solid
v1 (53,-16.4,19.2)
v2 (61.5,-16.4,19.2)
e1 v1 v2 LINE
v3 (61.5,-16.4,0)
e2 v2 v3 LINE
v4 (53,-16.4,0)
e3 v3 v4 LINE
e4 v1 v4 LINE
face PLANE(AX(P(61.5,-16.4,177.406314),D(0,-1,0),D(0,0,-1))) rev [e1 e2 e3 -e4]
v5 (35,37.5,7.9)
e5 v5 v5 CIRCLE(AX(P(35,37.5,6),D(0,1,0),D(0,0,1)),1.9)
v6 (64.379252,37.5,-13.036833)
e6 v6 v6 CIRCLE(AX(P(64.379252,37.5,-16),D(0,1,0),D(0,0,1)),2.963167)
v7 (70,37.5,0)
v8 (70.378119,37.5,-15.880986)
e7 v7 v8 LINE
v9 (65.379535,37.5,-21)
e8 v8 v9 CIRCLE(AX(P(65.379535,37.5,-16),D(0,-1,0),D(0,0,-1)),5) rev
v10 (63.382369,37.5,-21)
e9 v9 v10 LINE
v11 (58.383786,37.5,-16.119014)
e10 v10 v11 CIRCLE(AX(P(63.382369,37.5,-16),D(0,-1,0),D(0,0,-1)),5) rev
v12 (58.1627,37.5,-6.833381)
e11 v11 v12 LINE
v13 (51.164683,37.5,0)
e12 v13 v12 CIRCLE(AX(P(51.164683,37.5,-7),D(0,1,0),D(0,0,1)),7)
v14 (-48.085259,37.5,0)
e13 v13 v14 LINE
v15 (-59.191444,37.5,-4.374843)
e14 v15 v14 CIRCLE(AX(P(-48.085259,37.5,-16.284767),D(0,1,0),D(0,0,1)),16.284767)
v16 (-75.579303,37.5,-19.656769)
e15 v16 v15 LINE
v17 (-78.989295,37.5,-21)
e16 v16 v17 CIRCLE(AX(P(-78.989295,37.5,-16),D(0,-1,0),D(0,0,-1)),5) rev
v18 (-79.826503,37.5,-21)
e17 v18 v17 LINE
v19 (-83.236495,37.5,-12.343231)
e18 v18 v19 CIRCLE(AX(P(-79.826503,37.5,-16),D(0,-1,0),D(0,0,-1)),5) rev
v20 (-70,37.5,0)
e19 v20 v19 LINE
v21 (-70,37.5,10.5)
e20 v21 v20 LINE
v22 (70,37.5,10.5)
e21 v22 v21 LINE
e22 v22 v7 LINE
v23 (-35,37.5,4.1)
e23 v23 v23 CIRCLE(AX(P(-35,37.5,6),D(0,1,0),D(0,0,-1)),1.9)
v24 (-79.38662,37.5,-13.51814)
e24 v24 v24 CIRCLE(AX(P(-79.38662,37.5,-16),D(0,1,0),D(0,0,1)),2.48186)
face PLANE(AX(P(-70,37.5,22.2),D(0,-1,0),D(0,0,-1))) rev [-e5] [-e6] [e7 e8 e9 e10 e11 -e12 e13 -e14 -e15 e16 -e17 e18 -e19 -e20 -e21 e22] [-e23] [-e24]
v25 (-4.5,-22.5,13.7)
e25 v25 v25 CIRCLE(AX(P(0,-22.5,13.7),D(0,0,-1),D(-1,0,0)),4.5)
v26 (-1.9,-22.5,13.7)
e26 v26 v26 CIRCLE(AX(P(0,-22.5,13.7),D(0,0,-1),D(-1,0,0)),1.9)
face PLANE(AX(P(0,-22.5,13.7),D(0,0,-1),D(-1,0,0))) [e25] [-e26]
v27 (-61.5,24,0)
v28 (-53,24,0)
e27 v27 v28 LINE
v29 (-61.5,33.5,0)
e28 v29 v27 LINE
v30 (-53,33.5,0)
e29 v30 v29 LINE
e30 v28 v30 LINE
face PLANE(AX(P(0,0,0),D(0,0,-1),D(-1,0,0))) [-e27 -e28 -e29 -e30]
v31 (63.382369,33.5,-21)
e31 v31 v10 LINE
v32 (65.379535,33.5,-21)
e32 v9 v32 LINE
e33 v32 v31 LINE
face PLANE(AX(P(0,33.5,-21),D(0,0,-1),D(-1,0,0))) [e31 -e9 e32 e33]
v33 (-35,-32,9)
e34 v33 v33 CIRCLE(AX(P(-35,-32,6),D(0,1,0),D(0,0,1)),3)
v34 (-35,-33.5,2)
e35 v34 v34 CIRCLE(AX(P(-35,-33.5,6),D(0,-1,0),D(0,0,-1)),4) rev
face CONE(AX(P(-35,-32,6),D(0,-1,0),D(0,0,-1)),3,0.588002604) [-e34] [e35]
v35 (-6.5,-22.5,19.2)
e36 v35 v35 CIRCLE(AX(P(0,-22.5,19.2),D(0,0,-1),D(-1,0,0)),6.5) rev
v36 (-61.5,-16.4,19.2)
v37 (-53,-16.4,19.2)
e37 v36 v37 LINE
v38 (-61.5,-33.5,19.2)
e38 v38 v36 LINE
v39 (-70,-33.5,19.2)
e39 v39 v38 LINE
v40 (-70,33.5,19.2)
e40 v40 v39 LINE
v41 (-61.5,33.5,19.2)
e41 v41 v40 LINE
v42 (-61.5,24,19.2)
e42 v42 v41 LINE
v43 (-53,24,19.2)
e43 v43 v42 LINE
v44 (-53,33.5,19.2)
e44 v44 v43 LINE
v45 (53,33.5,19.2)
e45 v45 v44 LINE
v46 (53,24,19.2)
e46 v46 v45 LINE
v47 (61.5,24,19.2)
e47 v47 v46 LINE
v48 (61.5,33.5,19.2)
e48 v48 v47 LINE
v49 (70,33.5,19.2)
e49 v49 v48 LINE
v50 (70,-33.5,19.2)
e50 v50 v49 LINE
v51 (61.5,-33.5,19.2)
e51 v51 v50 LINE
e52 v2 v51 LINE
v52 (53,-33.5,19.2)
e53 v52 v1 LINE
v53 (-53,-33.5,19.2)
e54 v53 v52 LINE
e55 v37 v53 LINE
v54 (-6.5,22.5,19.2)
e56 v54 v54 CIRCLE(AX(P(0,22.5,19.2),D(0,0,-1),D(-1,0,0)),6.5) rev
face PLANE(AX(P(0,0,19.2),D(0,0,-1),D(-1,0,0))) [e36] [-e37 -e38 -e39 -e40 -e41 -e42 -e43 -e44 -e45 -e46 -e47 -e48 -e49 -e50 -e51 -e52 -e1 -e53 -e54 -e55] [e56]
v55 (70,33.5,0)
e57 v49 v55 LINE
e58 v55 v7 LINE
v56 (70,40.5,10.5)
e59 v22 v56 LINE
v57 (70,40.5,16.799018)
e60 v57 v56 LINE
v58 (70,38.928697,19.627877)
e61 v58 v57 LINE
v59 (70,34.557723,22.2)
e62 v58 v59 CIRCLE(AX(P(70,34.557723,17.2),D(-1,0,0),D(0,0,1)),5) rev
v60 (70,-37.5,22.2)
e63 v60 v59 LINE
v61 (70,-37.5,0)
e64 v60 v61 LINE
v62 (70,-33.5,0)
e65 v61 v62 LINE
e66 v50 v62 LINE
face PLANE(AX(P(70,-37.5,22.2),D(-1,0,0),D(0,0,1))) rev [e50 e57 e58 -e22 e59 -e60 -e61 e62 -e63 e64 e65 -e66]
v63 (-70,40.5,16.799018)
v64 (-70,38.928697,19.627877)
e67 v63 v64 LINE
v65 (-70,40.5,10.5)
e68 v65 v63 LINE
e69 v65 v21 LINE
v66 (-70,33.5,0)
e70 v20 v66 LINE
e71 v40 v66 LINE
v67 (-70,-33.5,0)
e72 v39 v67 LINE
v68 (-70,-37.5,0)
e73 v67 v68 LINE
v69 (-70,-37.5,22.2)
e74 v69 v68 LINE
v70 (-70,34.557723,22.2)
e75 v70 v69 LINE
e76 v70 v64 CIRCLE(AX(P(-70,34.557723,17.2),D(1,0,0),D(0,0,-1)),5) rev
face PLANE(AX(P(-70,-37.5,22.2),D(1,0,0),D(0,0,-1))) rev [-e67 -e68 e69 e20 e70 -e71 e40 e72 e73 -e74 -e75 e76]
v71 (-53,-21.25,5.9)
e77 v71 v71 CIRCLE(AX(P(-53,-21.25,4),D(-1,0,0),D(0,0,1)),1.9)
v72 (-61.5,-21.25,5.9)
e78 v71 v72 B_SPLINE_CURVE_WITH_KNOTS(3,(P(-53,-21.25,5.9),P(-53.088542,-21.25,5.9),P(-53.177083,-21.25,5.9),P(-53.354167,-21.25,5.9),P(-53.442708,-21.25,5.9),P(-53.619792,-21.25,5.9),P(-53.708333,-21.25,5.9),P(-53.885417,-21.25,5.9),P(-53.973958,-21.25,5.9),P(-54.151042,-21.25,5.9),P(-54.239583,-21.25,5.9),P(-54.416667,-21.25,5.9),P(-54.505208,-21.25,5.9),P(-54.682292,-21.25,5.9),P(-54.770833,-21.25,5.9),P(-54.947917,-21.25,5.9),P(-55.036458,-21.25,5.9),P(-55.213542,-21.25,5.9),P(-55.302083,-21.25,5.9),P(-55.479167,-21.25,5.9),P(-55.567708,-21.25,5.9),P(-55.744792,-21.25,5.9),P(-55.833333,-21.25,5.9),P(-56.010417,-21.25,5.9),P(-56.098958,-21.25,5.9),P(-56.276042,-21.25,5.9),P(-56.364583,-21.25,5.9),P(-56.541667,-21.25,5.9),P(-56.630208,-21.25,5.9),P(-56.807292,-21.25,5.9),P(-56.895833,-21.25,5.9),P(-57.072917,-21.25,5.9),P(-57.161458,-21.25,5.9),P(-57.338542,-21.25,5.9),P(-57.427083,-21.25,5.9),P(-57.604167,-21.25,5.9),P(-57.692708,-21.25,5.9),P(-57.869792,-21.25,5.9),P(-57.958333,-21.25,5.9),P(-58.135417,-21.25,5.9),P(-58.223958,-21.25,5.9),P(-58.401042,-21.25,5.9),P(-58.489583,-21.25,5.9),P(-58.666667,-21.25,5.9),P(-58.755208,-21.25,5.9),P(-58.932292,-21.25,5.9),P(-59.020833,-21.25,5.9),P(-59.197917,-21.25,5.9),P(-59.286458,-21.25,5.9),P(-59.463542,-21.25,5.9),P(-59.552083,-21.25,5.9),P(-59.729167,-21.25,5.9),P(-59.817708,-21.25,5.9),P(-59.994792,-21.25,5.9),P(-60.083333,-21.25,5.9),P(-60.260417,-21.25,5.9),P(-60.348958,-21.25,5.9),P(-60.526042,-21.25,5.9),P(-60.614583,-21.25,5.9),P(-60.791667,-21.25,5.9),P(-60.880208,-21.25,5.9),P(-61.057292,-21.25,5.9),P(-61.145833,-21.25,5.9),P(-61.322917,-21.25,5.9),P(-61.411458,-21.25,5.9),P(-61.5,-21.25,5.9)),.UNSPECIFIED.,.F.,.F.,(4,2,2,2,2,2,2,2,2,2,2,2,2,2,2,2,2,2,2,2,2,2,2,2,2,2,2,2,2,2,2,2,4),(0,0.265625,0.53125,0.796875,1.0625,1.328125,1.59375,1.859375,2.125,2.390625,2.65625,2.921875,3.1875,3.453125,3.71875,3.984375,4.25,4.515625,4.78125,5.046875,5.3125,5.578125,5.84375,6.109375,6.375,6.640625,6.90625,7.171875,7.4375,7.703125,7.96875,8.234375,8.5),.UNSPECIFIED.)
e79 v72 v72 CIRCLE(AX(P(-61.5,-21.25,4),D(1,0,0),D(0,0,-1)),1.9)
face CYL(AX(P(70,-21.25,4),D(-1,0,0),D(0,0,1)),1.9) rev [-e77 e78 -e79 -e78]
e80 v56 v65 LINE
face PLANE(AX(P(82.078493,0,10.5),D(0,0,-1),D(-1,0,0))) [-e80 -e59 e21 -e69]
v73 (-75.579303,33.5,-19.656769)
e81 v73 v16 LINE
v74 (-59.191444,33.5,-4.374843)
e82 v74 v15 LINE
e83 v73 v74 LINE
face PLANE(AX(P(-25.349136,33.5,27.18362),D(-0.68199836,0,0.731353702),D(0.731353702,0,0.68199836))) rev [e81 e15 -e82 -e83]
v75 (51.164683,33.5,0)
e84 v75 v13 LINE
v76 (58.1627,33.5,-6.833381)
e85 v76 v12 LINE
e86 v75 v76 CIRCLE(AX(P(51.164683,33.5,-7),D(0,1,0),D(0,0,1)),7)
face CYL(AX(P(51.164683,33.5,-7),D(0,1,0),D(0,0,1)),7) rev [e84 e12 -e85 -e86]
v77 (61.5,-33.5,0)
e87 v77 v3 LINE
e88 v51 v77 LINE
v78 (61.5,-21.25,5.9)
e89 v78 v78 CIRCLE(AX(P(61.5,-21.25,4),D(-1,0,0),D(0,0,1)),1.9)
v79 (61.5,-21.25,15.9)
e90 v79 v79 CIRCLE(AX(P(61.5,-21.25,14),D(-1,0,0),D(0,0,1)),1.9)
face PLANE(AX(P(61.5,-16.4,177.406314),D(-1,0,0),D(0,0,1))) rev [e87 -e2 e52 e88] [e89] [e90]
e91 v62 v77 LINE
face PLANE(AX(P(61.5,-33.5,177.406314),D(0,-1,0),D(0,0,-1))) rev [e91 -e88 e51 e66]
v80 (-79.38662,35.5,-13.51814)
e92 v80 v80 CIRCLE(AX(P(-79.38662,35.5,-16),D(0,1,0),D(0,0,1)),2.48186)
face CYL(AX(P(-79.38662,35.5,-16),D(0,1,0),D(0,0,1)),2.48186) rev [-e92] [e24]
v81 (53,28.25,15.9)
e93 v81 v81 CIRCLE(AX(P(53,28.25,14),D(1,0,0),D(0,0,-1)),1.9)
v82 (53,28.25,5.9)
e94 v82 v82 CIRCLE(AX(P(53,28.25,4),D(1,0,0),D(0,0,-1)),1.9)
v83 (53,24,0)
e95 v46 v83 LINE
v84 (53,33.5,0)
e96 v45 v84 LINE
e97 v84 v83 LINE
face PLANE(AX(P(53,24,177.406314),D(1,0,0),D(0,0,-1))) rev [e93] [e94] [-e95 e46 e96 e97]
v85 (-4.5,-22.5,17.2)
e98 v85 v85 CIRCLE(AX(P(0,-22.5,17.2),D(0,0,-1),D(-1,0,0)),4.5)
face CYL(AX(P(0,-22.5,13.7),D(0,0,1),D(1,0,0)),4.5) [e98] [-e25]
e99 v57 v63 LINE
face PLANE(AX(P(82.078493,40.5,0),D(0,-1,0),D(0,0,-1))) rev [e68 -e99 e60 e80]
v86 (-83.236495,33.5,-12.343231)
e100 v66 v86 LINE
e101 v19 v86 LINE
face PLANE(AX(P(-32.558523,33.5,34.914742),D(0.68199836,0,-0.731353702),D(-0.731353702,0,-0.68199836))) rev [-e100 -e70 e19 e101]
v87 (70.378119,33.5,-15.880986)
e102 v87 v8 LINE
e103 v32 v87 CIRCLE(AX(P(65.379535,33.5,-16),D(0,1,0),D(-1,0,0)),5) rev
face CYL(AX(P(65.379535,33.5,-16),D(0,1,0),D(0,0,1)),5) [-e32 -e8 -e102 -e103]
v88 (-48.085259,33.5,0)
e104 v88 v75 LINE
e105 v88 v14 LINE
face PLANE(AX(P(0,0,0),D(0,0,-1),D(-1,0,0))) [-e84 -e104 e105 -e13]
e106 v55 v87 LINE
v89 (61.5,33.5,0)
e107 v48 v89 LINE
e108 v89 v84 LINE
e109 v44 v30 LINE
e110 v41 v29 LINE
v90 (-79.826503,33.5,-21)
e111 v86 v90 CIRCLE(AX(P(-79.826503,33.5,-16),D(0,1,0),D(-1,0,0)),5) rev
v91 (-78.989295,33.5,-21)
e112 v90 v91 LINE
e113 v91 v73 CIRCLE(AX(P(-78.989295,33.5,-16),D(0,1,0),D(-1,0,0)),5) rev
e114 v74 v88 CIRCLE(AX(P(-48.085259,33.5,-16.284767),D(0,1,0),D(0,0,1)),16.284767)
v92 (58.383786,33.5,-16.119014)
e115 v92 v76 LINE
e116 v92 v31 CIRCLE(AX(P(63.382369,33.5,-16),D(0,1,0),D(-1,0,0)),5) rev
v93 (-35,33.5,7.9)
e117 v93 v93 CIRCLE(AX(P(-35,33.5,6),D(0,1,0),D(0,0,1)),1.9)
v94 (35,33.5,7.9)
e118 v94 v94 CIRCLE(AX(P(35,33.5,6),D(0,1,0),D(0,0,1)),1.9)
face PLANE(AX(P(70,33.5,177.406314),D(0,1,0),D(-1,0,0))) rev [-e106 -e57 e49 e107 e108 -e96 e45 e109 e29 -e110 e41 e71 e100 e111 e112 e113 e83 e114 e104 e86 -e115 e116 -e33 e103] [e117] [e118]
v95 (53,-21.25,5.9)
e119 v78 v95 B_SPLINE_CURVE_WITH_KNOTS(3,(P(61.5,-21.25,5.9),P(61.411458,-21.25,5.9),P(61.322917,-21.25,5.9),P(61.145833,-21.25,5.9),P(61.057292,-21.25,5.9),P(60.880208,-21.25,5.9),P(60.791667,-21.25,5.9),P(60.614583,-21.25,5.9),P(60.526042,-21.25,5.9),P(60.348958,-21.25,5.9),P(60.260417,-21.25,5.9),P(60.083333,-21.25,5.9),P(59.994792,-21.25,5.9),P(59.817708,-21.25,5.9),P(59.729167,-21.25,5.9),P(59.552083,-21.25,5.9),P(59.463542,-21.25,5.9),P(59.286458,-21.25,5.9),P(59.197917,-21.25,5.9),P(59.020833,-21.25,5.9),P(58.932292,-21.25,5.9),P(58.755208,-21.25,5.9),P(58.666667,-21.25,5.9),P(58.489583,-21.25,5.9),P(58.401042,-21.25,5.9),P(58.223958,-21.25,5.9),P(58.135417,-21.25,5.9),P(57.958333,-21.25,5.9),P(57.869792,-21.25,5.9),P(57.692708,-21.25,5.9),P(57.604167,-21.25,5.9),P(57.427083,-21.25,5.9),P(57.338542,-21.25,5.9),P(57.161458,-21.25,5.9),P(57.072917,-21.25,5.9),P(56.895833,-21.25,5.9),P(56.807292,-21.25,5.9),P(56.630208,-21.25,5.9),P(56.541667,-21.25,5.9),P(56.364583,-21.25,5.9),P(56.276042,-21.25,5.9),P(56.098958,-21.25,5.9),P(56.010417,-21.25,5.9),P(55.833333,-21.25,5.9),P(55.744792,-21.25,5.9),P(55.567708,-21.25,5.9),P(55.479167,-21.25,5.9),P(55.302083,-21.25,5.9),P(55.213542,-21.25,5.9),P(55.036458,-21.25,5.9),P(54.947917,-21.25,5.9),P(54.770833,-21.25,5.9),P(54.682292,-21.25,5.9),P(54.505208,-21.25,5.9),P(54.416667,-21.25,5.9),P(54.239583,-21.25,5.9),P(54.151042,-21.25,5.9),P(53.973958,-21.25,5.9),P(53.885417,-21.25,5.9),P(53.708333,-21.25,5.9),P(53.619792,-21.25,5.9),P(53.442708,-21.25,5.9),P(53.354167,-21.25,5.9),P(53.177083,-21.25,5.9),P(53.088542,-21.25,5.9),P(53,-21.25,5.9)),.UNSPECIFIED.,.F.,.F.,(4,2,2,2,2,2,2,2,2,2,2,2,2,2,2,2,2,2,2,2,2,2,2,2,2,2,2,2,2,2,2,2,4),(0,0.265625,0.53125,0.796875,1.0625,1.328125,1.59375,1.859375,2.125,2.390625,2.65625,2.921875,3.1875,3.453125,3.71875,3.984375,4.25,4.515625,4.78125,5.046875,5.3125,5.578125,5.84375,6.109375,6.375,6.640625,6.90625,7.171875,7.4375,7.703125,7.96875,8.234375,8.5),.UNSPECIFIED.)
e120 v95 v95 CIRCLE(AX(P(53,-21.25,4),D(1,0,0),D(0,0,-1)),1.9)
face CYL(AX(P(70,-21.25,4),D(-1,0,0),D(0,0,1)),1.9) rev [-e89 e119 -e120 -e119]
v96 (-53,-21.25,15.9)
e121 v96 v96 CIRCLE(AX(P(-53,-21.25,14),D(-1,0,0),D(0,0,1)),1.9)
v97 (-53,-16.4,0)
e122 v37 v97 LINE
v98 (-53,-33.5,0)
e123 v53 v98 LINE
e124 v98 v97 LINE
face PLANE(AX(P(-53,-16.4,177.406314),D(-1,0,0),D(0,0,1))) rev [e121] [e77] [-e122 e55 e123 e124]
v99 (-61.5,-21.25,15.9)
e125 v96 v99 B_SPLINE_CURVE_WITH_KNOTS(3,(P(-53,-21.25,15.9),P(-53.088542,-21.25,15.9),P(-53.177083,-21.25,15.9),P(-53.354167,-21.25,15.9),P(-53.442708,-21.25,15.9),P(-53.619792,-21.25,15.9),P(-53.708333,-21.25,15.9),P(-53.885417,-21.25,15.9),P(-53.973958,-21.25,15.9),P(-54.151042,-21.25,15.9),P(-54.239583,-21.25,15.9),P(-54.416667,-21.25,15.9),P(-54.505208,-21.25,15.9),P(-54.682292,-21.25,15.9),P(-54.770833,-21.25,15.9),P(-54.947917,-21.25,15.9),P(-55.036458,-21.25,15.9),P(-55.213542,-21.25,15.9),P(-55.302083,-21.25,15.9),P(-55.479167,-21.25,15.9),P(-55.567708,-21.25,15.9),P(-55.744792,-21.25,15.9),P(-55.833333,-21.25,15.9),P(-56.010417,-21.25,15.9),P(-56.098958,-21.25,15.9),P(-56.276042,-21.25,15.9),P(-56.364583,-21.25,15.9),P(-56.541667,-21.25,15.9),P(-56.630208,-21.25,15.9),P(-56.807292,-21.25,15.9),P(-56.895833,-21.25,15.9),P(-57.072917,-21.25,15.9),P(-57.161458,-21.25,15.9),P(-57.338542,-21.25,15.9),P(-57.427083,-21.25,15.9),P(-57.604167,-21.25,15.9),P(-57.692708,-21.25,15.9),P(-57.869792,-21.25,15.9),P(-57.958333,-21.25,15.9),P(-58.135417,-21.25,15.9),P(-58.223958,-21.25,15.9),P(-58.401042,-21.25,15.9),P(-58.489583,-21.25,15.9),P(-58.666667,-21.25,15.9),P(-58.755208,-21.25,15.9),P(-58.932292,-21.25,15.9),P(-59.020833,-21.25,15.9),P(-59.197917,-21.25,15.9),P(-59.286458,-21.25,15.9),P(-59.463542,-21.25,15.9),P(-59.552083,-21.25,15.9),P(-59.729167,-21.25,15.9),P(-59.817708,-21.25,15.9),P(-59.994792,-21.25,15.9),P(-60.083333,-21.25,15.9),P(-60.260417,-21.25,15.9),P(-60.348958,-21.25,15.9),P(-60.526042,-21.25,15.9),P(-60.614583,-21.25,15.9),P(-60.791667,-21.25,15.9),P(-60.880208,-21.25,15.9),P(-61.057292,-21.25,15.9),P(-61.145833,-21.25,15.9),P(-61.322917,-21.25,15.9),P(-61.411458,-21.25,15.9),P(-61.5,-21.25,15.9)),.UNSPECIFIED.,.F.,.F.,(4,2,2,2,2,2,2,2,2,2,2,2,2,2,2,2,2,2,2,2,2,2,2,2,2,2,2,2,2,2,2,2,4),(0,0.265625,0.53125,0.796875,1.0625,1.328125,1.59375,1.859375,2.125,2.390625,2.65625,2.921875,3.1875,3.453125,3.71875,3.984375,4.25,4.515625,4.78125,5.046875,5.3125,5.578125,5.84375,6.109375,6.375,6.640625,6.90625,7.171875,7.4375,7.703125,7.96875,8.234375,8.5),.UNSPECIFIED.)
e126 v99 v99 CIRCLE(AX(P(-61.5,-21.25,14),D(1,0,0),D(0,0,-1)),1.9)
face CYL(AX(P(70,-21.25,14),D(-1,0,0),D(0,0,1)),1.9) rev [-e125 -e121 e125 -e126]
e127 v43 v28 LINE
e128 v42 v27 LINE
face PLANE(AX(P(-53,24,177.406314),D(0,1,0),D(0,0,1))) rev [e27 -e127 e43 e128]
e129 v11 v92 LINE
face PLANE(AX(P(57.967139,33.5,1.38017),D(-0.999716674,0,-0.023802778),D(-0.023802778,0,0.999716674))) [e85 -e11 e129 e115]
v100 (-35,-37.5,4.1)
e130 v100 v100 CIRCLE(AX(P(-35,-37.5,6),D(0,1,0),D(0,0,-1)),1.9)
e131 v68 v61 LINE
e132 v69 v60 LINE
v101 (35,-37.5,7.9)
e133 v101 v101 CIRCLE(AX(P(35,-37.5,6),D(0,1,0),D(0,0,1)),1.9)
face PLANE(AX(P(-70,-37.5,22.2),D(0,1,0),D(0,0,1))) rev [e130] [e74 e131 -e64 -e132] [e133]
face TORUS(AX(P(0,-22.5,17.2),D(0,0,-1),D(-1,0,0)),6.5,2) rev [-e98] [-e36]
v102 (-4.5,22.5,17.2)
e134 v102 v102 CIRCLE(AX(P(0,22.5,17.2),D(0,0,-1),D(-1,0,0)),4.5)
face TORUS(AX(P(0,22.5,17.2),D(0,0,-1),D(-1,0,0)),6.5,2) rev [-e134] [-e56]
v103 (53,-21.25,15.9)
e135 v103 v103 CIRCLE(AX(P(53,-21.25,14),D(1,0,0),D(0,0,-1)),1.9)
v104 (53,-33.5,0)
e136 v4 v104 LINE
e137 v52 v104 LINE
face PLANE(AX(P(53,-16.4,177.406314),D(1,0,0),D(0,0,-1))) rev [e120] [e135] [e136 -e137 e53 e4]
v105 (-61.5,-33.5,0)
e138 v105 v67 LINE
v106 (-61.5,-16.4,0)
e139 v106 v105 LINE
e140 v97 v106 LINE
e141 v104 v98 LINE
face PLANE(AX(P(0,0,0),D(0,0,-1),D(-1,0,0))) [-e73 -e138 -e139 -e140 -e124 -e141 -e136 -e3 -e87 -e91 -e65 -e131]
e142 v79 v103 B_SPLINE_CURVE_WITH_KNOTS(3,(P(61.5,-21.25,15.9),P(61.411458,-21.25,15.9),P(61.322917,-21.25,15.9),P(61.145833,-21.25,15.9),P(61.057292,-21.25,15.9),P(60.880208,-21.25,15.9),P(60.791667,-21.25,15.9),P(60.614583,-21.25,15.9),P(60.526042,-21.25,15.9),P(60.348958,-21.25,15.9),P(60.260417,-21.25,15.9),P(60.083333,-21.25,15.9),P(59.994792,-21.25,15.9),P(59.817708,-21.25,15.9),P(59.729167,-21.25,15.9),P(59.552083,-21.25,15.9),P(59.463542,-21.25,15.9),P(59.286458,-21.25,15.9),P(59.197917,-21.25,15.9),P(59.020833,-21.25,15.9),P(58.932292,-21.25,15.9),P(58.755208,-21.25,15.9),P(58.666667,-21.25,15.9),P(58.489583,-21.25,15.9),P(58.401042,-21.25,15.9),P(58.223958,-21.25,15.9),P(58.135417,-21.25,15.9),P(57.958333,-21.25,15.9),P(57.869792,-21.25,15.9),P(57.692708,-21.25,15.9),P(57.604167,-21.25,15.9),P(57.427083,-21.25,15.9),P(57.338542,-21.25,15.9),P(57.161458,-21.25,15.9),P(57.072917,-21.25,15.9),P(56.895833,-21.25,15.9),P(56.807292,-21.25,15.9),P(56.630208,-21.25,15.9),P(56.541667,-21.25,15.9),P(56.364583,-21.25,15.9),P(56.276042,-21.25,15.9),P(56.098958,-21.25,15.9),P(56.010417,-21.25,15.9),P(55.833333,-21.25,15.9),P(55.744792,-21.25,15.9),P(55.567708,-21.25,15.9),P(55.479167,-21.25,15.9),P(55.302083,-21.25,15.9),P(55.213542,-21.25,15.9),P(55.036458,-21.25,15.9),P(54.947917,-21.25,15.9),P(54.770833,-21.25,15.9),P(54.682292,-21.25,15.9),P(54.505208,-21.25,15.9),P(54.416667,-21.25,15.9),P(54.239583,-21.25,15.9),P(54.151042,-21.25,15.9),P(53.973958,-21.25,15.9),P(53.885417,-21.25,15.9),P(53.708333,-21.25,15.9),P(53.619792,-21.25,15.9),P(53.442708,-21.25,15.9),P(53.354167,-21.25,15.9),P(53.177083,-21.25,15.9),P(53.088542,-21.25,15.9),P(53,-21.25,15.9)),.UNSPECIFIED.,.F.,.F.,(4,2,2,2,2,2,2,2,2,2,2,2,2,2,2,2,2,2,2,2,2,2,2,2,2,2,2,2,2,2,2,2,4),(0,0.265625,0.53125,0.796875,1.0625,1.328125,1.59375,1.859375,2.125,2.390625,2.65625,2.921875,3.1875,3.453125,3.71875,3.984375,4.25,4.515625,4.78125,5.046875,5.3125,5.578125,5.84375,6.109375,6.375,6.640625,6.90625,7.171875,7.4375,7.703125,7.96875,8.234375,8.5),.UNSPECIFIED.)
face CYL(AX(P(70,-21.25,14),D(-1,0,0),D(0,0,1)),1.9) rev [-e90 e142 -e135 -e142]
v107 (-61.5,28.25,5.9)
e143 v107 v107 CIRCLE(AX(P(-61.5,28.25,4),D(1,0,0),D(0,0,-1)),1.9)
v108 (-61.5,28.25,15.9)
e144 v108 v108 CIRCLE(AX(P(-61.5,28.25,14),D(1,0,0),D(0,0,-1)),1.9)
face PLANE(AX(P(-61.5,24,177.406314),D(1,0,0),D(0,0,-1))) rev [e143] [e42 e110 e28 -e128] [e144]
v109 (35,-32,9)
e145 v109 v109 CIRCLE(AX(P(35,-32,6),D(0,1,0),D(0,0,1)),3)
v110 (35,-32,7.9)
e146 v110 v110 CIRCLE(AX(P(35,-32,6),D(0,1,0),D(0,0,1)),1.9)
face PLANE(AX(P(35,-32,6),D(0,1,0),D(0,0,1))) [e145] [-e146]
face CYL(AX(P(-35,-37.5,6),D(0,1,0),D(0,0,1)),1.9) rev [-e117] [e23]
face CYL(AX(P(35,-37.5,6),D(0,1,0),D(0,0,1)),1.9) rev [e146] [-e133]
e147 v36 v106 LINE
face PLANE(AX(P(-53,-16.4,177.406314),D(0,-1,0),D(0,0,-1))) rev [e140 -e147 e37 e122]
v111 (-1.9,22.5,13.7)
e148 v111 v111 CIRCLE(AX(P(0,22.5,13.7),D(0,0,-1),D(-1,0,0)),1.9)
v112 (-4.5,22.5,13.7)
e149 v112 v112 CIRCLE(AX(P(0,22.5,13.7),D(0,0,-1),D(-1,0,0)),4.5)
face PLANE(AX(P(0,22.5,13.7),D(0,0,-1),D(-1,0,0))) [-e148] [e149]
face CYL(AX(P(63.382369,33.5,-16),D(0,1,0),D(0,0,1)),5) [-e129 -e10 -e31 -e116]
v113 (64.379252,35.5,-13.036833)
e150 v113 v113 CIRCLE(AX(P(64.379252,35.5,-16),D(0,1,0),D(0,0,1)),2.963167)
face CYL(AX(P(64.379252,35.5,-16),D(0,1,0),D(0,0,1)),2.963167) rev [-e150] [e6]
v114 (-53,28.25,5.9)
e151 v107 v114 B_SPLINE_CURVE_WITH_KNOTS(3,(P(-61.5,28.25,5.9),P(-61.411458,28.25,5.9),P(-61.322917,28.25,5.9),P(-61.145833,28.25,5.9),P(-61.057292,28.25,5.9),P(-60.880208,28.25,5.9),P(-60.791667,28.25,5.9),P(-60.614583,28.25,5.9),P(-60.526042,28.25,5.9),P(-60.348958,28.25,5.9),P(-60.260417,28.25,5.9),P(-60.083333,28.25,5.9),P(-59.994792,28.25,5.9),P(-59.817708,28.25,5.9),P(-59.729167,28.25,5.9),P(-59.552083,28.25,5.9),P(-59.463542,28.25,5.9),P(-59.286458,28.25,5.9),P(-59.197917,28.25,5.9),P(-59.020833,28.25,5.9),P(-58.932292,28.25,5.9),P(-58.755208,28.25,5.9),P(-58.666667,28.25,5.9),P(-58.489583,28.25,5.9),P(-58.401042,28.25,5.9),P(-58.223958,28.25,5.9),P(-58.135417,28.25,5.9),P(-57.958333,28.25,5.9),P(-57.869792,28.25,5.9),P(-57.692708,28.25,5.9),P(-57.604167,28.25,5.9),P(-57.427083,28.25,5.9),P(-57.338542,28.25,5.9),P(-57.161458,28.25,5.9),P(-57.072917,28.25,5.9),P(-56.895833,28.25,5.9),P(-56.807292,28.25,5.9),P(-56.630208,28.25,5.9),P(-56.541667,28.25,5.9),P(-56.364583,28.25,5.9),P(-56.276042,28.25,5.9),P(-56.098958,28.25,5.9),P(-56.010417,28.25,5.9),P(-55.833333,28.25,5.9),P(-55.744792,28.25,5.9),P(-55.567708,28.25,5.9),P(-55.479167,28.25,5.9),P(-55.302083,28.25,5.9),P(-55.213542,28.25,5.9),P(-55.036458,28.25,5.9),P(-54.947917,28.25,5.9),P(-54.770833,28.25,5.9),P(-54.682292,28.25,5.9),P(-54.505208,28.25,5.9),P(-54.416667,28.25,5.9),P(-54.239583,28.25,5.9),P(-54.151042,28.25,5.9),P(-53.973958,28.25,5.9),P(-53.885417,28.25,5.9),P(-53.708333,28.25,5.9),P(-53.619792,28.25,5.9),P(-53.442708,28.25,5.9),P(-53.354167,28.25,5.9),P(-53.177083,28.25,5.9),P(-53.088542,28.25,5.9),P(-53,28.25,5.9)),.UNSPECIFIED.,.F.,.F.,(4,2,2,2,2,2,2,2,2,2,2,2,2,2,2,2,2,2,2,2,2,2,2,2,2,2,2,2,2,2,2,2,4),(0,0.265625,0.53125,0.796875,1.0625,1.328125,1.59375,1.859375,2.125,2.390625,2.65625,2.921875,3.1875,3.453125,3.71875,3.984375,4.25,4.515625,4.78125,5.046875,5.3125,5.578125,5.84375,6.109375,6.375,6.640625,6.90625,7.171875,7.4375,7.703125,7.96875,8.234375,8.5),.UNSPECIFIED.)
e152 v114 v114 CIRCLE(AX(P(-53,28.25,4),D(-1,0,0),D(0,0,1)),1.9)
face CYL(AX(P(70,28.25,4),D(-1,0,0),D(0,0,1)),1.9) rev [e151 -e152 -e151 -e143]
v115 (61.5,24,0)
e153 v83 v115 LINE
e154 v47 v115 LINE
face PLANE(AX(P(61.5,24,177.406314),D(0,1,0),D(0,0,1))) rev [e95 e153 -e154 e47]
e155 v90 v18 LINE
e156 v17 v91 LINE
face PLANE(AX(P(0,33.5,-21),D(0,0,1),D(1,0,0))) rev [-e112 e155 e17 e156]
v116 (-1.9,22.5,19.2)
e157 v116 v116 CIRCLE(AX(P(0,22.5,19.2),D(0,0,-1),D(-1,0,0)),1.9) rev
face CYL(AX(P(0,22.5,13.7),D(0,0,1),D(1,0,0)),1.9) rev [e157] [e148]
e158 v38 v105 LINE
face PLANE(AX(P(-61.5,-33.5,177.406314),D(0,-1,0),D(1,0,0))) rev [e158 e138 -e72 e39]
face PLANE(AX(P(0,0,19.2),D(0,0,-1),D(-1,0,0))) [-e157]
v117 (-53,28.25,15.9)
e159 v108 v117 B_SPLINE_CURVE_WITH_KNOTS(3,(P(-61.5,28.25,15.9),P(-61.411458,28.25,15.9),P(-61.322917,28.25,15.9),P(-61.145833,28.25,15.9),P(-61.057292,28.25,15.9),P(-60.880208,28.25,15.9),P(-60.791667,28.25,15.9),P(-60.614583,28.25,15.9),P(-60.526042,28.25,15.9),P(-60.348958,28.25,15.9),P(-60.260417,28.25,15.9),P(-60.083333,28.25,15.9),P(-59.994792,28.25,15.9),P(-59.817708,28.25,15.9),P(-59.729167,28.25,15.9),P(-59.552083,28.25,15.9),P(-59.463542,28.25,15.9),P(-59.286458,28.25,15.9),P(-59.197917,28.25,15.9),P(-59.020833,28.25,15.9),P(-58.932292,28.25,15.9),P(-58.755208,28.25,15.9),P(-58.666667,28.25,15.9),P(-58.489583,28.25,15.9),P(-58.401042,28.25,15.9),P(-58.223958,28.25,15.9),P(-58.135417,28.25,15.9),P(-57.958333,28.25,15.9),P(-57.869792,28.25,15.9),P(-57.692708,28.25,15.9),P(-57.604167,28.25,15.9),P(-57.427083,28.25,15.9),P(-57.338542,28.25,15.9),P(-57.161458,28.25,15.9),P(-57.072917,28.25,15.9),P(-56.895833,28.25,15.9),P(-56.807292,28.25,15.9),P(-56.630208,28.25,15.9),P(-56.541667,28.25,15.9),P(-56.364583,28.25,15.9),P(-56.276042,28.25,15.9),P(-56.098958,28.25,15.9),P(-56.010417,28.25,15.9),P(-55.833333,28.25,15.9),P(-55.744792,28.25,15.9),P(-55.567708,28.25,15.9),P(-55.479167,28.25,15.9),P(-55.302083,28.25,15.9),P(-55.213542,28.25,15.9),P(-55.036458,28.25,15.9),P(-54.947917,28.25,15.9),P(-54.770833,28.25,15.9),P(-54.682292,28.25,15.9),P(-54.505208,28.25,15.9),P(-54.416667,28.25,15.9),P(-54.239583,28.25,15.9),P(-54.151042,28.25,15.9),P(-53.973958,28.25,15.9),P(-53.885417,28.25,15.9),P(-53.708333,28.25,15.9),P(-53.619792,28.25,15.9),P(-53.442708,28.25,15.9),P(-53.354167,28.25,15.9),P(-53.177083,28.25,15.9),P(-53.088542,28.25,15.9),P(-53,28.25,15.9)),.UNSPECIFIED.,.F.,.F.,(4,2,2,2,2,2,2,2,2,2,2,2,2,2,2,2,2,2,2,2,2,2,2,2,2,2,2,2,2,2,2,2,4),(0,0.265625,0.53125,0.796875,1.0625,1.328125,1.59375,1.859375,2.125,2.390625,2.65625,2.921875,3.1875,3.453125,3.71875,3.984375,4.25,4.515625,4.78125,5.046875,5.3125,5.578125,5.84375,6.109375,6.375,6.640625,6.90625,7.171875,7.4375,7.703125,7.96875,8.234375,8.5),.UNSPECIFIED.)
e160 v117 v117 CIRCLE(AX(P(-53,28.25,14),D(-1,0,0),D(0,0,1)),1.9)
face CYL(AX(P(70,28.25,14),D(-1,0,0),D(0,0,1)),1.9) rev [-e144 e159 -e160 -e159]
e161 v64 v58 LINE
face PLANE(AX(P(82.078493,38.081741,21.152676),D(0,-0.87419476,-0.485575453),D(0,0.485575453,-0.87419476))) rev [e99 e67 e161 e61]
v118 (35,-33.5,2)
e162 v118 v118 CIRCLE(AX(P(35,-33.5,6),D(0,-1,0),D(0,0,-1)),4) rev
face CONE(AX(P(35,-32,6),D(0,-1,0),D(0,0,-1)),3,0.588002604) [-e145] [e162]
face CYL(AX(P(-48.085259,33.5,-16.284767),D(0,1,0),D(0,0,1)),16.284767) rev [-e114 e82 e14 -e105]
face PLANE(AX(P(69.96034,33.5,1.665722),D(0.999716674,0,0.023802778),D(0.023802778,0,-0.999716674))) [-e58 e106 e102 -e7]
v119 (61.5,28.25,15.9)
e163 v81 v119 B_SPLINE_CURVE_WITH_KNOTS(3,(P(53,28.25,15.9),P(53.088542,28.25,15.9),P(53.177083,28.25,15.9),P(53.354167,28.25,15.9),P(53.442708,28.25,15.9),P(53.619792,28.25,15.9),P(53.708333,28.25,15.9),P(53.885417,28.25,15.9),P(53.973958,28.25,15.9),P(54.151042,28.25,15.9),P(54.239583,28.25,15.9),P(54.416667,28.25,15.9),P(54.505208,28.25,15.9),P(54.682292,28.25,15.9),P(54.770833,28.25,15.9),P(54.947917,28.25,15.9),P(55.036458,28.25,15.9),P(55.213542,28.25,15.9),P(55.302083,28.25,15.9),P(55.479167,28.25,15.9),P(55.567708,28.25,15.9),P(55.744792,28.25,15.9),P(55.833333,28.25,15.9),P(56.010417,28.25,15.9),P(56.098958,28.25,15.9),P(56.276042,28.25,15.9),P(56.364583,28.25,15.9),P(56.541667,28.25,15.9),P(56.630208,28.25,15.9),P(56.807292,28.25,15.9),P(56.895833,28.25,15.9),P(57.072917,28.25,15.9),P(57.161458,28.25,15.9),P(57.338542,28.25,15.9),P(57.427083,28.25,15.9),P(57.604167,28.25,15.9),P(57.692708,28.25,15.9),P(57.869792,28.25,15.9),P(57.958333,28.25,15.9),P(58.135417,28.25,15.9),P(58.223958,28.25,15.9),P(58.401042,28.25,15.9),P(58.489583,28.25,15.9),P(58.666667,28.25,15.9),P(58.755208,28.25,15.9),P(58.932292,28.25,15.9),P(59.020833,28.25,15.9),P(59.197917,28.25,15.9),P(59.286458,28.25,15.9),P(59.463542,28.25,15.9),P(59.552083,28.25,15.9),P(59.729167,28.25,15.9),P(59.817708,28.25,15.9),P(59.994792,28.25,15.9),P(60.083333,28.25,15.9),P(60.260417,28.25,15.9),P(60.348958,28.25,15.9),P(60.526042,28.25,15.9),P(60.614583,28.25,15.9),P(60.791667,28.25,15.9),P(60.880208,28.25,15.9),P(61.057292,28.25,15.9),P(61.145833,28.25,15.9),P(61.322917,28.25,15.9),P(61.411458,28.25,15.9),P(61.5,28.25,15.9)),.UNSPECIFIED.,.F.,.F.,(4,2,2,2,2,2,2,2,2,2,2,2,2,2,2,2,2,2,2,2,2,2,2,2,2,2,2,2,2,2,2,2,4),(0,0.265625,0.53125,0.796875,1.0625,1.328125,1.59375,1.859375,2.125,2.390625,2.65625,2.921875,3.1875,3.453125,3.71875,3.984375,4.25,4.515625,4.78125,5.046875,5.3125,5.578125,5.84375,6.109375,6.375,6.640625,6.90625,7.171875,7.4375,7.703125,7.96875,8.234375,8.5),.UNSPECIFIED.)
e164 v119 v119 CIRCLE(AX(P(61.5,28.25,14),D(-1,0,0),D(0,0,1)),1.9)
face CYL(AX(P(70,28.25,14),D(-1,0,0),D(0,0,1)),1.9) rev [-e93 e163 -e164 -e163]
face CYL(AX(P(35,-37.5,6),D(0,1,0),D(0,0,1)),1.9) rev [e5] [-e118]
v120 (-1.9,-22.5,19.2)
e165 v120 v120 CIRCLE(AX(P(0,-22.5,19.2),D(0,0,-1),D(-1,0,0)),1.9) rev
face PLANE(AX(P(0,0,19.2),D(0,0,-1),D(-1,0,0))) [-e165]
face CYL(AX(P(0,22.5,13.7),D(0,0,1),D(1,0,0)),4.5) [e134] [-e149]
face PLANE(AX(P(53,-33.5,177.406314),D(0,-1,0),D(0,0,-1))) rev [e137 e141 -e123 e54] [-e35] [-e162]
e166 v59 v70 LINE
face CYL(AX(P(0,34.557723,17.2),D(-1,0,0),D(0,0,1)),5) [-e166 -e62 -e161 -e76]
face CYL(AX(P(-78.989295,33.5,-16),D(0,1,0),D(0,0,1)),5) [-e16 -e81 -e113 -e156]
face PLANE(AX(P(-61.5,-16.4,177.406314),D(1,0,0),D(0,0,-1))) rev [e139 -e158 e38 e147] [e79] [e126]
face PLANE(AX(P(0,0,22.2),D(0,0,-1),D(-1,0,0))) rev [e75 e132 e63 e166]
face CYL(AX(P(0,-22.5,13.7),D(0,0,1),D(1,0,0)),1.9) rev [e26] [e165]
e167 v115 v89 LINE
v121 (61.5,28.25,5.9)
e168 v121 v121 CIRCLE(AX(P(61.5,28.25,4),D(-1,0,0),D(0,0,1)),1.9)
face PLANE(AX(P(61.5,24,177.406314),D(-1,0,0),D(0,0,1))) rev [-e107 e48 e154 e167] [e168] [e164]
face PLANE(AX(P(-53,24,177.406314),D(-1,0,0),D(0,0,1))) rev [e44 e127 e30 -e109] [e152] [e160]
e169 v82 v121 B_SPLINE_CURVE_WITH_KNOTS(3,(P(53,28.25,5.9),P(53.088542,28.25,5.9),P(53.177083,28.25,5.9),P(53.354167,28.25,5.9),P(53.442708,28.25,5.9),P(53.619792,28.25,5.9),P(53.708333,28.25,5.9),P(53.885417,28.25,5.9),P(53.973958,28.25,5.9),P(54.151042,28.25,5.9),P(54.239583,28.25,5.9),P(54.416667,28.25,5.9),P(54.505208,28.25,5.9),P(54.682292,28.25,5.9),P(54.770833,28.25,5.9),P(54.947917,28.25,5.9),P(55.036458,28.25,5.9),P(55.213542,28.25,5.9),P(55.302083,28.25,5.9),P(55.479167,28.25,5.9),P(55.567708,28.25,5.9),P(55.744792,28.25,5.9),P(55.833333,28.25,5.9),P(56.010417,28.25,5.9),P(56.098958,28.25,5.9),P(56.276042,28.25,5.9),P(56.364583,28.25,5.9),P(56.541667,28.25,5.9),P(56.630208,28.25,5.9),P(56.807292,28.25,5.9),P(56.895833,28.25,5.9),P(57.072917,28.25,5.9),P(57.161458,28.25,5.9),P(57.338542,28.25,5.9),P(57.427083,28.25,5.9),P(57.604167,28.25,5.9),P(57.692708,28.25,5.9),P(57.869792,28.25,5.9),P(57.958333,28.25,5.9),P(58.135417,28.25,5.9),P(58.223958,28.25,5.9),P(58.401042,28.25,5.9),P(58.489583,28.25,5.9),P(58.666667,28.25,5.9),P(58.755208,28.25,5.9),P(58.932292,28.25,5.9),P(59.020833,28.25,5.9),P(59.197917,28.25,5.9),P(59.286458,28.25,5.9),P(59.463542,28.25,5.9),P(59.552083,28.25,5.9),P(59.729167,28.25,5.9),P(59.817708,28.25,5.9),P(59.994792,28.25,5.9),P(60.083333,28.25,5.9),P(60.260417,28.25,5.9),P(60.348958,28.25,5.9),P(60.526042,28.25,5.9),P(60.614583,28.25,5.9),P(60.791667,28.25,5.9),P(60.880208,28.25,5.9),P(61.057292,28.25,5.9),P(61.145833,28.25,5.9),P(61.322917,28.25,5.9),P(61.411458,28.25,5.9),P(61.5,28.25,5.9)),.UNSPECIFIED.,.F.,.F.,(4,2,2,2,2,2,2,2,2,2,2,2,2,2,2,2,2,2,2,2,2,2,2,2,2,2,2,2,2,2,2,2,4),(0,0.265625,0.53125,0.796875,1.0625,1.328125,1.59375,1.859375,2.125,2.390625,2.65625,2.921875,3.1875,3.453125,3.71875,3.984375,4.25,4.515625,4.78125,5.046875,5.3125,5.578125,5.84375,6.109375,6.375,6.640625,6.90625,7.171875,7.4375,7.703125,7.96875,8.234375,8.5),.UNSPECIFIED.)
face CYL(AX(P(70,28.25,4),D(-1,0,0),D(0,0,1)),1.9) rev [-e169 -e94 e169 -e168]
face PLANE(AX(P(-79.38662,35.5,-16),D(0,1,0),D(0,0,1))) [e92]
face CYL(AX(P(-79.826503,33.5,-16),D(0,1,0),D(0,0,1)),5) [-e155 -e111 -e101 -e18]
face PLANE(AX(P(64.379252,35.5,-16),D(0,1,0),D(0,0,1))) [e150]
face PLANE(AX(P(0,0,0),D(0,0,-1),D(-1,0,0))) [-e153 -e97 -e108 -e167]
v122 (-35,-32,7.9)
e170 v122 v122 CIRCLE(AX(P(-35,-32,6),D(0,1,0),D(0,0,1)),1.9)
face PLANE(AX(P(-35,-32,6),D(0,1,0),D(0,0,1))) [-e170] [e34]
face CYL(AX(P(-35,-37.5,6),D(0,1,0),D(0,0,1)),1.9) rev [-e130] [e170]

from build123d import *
from OCP.BRepFilletAPI import BRepFilletAPI_MakeChamfer

# Parameters (mm, degrees)
SKETCH1_W               = 140
SKETCH1_H               = 75
BOSS_EXTRUDE1_DEPTH     = 22.2
CUT_EXTRUDE1_DEPTH      = 19.2
CUT_EXTRUDE2_DEPTH      = 147.625679879
CUT_EXTRUDE2_DEPTH_BACK = 147.625679879
SKETCH3_R               = 1.9
CUT_EXTRUDE5_DEPTH      = 103.146169776
CUT_EXTRUDE5_DEPTH_BACK = 103.146169776
SKETCH9_R               = 1.9
BOSS_EXTRUDE6_DEPTH     = 4
FILLET2_R               = 5
BOSS_EXTRUDE10_DEPTH    = 140
FILLET5_R               = 5
SKETCH28_R              = 2.481859786
SKETCH28_R_2            = 2.963166916
CUT_EXTRUDE11_DEPTH     = 2
SKETCH27_R              = 4
SKETCH27_R_2            = 1.9
BOSS_EXTRUDE15_DEPTH    = 1.5
CHAMFER1_SIZE           = 1.5
CHAMFER1_SIZE_2         = 1
SKETCH29_R              = 4.5
SKETCH29_R_2            = 1.9
BOSS_EXTRUDE16_DEPTH    = 5.5
FILLET7_R               = 2


with BuildPart() as part:
    # Sketch1 → Boss-Extrude1 (new body)
    with BuildSketch(Plane.XY):
        Rectangle(SKETCH1_W, SKETCH1_H)
    extrude(amount=BOSS_EXTRUDE1_DEPTH)

    # Sketch2 → Cut-Extrude1 (cut)
    with BuildSketch(Plane(origin=(0, 0, 0), x_dir=(-1, 0, 0), z_dir=(0, 0, -1))):
        Polygon((-61.5, 24), (-53, 24), (-53, 33.5), (53, 33.5), (53, 24), (61.5, 24), (61.5, 33.5), (70, 33.5), (70, 20.2), (70, -20.2), (70, -33.5), (61.5, -33.5), (61.5, -16.4), (53, -16.4), (53, -33.5), (-53, -33.5), (-53, -16.4), (-61.5, -16.4), (-61.5, -33.5), (-70, -33.5), (-70, -20), (-70, 20), (-70, 33.5), (-61.5, 33.5), align=None)
    extrude(amount=-CUT_EXTRUDE1_DEPTH, mode=Mode.SUBTRACT)

    # Sketch3 → Cut-Extrude2 (cut, two sides: drawn at the far end of the back side and taken through both)
    with BuildSketch(Plane.ZY.offset(70).offset(-CUT_EXTRUDE2_DEPTH_BACK)):
        with Locations((14, 28.25)):
            Circle(SKETCH3_R)
        with Locations((4, 28.25)):
            Circle(SKETCH3_R)
        with Locations((4, -21.25)):
            Circle(SKETCH3_R)
        with Locations((14, -21.25)):
            Circle(SKETCH3_R)
    extrude(amount=CUT_EXTRUDE2_DEPTH + CUT_EXTRUDE2_DEPTH_BACK, mode=Mode.SUBTRACT)

    # Sketch9 → Cut-Extrude5 (cut, two sides: drawn at the far end of the back side and taken through both)
    with BuildSketch(Plane(origin=(0, -33.5, 0), x_dir=(1, 0, 0), z_dir=(0, 1, 0)).offset(-CUT_EXTRUDE5_DEPTH_BACK)):
        with Locations(Location((35, -6, 0), (0, 0, 270))):
            Circle(SKETCH9_R)
        with Locations(Location((-35, -6, 0), (0, 0, 90))):
            Circle(SKETCH9_R)
    extrude(amount=CUT_EXTRUDE5_DEPTH + CUT_EXTRUDE5_DEPTH_BACK, mode=Mode.SUBTRACT)

    # Sketch14 → Boss-Extrude6 (add)
    with BuildSketch(Plane(origin=(0, 37.5, 0), x_dir=(1, 0, 0), z_dir=(0, 1, 0))):
        with BuildLine():
            Line((-92.519742911, 21), (-70, 0))
            Line((-70, 0), (-48.085259489, 0))
            ThreePointArc((-48.085259489, 0), (-54.053646754, 1.133133727), (-59.191444218, 4.374842509))
            Line((-59.191444218, 4.374842509), (-77.019742911, 21))
            Line((-77.019742911, 21), (-92.519742911, 21))
        make_face()
        with BuildLine():
            Line((51.164682821, 0), (70, 0))
            Line((70, 0), (70.5, 21))
            Line((70.5, 21), (58.5, 21))
            Line((58.5, 21), (58.162699537, 6.833380554))
            ThreePointArc((58.162699537, 6.833380554), (56.055166635, 1.991690099), (51.164682821, 0))
        make_face()
    extrude(amount=-BOSS_EXTRUDE6_DEPTH)

    # Fillet2
    fillet2_edges = [part.edges().sort_by_distance(p)[0] for p in [
        (-92.519742911, 35.5, -21),
        (-77.019742911, 35.5, -21),
        (58.5, 35.5, -21),
        (70.5, 35.5, -21),
    ]]
    fillet(fillet2_edges, radius=FILLET2_R)

    # Sketch19 → Boss-Extrude10 (add)
    with BuildSketch(Plane.ZY.offset(70)):
        Polygon((10.5, 37.5), (22.2, 37.5), (16.799018003, 40.5), (10.5, 40.5), align=None)
    extrude(amount=-BOSS_EXTRUDE10_DEPTH)

    # Fillet5
    fillet5_edges = [part.edges().sort_by_distance(p)[0] for p in [
        (0, 37.5, 22.2),
    ]]
    fillet(fillet5_edges, radius=FILLET5_R)

    # Sketch28 → Cut-Extrude11 (cut)
    with BuildSketch(Plane(origin=(0, 37.5, 0), x_dir=(1, 0, 0), z_dir=(0, 1, 0))):
        with Locations(Location((-79.386619677, 16, 0), (0, 0, 270))):
            Circle(SKETCH28_R)
        with Locations(Location((64.379251942, 16, 0), (0, 0, 270))):
            Circle(SKETCH28_R_2)
    extrude(amount=-CUT_EXTRUDE11_DEPTH, mode=Mode.SUBTRACT)

    # Sketch27 → Boss-Extrude15 (add)
    # profile 1 of 2: a face of its own
    with BuildSketch(Plane(origin=(0, -33.5, 0), x_dir=(1, 0, 0), z_dir=(0, 1, 0))):
        with Locations(Location((35, -6, 0), (0, 0, 90))):
            Circle(SKETCH27_R)
        with Locations(Location((35, -6, 0), (0, 0, 270))):
            Circle(SKETCH27_R_2, mode=Mode.SUBTRACT)
    # profile 2 of 2: a face of its own
    with BuildSketch(Plane(origin=(0, -33.5, 0), x_dir=(1, 0, 0), z_dir=(0, 1, 0))):
        with Locations(Location((-35, -6, 0), (0, 0, 90))):
            Circle(SKETCH27_R)
        with Locations(Location((-35, -6, 0), (0, 0, 270))):
            Circle(SKETCH27_R_2, mode=Mode.SUBTRACT)
    extrude(amount=BOSS_EXTRUDE15_DEPTH)

    # Chamfer1
    chamfer1_edges_1 = [part.edges().sort_by_distance(p)[0] for p in [
        (35, -32, 10),
    ]]
    chamfer1_side_1 = [part.faces().sort_by_distance(p)[0] for p in [
        (35, -32.02, 10),
    ]]
    chamfer1_edges_2 = [part.edges().sort_by_distance(p)[0] for p in [
        (-35, -32, 10),
    ]]
    chamfer1_side_2 = [part.faces().sort_by_distance(p)[0] for p in [
        (-35, -32.02, 10),
    ]]
    chamfer1 = BRepFilletAPI_MakeChamfer(part.part.solid().wrapped)
    for e in chamfer1_edges_1:
        chamfer1.Add(CHAMFER1_SIZE - 0.0001, CHAMFER1_SIZE_2 - 0.0001, e.wrapped, chamfer1_side_1[0].wrapped)
    for e in chamfer1_edges_2:
        chamfer1.Add(CHAMFER1_SIZE - 0.0001, CHAMFER1_SIZE_2 - 0.0001, e.wrapped, chamfer1_side_2[0].wrapped)
    add(Compound.cast(chamfer1.Shape()), mode=Mode.REPLACE)  # a hair under: the kernel refuses the full size

    # Sketch29 → Boss-Extrude16 (add)
    # profile 1 of 2: a face of its own
    with BuildSketch(Plane(origin=(0, 0, 19.2), x_dir=(-1, 0, 0), z_dir=(0, 0, -1))):
        with Locations((0, 22.5)):
            Circle(SKETCH29_R)
        with Locations((0, 22.5)):
            Circle(SKETCH29_R_2, mode=Mode.SUBTRACT)
    # profile 2 of 2: a face of its own
    with BuildSketch(Plane(origin=(0, 0, 19.2), x_dir=(-1, 0, 0), z_dir=(0, 0, -1))):
        with Locations((0, -22.5)):
            Circle(SKETCH29_R)
        with Locations((0, -22.5)):
            Circle(SKETCH29_R_2, mode=Mode.SUBTRACT)
    extrude(amount=BOSS_EXTRUDE16_DEPTH)

    # Fillet7
    fillet7_edges = [part.edges().sort_by_distance(p)[0] for p in [
        (4.5, 22.5, 19.2),
        (4.5, -22.5, 19.2),
    ]]
    fillet(fillet7_edges, radius=FILLET7_R)


solid = part.part
